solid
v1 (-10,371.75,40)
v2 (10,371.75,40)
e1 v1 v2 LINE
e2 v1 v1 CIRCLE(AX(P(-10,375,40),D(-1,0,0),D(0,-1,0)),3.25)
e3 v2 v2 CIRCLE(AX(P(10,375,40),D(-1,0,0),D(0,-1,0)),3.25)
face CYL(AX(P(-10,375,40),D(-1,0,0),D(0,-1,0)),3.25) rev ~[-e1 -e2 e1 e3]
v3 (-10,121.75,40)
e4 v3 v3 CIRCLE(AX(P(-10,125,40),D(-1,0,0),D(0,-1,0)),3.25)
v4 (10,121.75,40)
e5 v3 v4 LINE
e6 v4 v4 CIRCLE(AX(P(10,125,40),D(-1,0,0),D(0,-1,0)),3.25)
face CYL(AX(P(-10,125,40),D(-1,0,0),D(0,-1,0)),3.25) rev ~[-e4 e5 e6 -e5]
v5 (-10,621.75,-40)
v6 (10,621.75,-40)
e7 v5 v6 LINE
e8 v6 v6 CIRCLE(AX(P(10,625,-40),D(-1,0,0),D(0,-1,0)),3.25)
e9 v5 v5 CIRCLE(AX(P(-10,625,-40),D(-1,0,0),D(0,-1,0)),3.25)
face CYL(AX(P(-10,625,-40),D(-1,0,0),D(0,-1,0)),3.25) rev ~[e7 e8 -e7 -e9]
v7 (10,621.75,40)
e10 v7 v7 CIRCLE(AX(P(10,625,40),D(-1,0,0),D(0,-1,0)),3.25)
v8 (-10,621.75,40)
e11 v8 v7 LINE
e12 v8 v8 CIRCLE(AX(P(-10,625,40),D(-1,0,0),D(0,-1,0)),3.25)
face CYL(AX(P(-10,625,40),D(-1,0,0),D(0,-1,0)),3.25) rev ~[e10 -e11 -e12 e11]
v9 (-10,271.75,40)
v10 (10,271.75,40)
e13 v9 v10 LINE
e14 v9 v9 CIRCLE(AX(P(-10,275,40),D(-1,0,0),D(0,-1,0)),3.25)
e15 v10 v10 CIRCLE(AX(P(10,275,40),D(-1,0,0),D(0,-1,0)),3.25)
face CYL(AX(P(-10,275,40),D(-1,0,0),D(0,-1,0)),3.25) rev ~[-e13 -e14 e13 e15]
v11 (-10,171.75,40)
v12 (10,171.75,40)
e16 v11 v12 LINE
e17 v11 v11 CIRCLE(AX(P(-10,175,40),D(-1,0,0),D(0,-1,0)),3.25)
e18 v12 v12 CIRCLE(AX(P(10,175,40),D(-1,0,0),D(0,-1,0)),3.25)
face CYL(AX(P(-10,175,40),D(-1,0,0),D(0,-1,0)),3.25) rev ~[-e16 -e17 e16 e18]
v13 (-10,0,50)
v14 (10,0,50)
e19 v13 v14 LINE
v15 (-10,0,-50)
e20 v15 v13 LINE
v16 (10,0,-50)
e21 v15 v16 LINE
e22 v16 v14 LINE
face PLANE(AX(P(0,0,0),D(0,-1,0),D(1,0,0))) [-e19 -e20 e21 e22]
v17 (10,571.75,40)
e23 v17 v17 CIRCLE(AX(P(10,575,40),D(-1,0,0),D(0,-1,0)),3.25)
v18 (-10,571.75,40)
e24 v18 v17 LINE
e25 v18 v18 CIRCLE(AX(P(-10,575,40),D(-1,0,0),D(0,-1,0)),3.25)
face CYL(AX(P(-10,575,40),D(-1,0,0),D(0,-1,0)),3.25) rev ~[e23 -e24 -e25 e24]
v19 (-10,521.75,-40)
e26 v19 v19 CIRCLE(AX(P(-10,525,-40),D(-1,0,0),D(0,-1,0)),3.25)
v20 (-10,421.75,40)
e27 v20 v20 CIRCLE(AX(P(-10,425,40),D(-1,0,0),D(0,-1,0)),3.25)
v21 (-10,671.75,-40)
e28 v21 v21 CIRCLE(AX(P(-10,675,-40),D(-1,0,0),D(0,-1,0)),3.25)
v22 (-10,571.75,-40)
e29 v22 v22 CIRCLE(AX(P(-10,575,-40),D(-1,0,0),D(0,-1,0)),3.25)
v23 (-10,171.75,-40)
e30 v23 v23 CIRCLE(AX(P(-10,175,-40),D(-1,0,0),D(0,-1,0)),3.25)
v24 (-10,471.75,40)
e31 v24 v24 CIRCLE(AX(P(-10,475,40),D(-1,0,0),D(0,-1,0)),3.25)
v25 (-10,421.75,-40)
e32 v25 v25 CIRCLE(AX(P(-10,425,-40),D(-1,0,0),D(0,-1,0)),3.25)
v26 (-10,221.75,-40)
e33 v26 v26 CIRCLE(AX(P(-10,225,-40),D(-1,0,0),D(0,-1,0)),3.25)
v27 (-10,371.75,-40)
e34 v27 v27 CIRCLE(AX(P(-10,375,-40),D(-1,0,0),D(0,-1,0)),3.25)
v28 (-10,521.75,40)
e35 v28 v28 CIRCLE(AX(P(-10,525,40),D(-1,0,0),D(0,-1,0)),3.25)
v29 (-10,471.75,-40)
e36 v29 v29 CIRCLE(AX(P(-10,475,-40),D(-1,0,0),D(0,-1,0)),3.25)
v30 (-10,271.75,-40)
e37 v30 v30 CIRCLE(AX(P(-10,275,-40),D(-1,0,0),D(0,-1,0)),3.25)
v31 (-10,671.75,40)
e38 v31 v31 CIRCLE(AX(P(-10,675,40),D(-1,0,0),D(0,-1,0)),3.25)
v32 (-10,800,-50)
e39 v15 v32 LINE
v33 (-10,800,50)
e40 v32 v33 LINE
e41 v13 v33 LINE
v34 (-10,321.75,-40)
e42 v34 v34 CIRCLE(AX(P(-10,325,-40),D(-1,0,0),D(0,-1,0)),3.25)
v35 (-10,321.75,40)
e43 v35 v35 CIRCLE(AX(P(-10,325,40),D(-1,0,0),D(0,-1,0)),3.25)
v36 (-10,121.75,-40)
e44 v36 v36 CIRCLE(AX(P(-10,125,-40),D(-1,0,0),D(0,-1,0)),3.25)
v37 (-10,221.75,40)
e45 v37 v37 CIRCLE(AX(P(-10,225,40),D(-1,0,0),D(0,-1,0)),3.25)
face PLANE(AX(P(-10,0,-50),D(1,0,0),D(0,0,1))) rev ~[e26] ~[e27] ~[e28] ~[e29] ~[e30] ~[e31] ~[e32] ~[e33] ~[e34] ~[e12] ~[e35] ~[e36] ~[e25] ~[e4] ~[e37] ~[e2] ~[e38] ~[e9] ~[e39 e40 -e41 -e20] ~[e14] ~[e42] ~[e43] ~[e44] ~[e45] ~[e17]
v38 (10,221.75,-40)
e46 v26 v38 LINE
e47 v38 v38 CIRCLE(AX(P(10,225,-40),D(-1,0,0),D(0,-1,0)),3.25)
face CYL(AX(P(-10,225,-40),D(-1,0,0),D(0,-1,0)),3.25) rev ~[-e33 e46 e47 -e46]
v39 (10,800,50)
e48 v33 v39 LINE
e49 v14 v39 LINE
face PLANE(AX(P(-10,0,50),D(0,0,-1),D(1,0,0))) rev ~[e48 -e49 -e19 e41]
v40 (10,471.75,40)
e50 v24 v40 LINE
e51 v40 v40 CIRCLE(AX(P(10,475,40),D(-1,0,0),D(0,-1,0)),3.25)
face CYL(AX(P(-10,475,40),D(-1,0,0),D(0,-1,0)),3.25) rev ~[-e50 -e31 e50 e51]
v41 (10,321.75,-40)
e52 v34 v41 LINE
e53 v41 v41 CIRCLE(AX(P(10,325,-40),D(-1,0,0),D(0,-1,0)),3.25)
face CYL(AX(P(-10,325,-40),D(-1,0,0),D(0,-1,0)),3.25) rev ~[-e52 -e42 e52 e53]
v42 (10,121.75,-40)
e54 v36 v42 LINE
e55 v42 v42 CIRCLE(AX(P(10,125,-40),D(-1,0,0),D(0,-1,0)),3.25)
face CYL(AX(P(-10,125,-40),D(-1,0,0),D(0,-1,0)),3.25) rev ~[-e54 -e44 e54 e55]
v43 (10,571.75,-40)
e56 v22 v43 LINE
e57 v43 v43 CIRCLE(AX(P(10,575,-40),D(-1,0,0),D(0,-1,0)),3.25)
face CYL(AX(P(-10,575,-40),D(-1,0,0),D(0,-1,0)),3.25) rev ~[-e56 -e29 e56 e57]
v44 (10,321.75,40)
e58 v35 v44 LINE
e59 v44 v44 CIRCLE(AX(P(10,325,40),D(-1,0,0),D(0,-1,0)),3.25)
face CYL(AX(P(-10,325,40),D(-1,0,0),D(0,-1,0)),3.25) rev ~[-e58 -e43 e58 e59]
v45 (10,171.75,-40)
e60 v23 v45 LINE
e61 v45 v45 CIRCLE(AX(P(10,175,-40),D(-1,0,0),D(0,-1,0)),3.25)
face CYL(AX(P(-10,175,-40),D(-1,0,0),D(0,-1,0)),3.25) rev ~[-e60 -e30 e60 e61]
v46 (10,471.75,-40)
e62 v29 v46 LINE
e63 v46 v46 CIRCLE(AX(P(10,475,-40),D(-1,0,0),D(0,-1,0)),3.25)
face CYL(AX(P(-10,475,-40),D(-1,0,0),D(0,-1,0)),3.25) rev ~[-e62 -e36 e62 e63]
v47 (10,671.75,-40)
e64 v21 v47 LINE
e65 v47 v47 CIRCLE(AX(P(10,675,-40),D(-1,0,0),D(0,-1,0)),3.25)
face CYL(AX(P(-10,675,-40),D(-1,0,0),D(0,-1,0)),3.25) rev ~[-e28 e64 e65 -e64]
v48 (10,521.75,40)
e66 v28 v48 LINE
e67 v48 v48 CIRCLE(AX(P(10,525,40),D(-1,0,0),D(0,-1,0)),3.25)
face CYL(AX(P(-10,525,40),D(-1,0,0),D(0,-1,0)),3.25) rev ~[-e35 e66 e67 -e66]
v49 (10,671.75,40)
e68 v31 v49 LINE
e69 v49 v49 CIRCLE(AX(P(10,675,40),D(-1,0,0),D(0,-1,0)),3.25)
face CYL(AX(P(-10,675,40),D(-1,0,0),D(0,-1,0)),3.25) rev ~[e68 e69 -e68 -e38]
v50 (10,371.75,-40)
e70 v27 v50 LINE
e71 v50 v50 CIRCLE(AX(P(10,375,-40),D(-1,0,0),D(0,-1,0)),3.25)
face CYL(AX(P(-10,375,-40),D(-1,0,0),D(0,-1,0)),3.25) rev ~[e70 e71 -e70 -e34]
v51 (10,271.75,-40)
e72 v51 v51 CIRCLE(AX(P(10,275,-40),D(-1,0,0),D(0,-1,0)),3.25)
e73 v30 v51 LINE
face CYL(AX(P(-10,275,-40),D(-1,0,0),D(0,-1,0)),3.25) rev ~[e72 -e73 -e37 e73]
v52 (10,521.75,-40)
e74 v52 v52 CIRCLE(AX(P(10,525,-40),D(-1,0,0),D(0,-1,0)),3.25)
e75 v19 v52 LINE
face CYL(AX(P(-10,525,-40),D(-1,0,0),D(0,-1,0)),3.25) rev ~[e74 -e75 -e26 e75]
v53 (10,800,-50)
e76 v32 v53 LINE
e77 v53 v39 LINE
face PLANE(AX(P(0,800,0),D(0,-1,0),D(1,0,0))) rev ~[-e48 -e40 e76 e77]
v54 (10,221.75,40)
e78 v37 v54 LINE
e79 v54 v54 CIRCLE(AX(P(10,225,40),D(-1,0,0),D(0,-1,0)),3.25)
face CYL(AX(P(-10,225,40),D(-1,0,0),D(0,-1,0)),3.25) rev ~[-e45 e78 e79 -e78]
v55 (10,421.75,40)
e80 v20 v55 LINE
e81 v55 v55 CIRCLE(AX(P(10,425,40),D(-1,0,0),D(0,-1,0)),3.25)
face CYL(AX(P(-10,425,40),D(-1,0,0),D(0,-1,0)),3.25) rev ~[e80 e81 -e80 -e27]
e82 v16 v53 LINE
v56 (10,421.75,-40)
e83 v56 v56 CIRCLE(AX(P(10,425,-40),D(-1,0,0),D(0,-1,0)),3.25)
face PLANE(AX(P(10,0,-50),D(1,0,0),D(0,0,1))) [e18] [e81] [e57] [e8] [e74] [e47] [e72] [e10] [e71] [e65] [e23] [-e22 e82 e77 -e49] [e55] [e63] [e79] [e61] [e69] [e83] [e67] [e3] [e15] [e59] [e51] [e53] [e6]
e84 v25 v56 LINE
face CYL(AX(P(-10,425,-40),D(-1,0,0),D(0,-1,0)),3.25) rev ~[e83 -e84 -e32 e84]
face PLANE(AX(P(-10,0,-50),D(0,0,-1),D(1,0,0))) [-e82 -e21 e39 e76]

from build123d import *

# Parameters (mm, degrees)
F0_W     = 20
F0_H     = 100
F1_DEPTH = 800
F2_R     = 3.25
F3_DEPTH = 20


# Not quite as in the source:
# - a feature names something its author has since deleted; it is built from what else it names


with BuildPart() as f1:
    # F0 (on Front) → F1 (new body)
    with BuildSketch(Plane.XZ):
        Rectangle(F0_W, F0_H)
    extrude(amount=-F1_DEPTH)

    # F2 (on face) → F3 (cut, through all)
    with BuildSketch(Plane(origin=(-10, 0, 0), x_dir=(0, -1, 0), z_dir=(-1, 0, 0))):
        with Locations((-625, 40)):
            Circle(F2_R)
        with Locations((-575, 40)):
            Circle(F2_R)
        with Locations((-675, 40)):
            Circle(F2_R)
        with Locations((-675, -40)):
            Circle(F2_R)
        with Locations((-625, -40)):
            Circle(F2_R)
        with Locations((-525, -40)):
            Circle(F2_R)
        with Locations((-575, -40)):
            Circle(F2_R)
        with Locations((-525, 40)):
            Circle(F2_R)
        with Locations((-475, 40)):
            Circle(F2_R)
        with Locations((-425, 40)):
            Circle(F2_R)
        with Locations((-375, 40)):
            Circle(F2_R)
        with Locations((-325, 40)):
            Circle(F2_R)
        with Locations((-275, 40)):
            Circle(F2_R)
        with Locations((-225, 40)):
            Circle(F2_R)
        with Locations((-175, 40)):
            Circle(F2_R)
        with Locations((-175, -40)):
            Circle(F2_R)
        with Locations((-225, -40)):
            Circle(F2_R)
        with Locations((-325, -40)):
            Circle(F2_R)
        with Locations((-375, -40)):
            Circle(F2_R)
        with Locations((-425, -40)):
            Circle(F2_R)
        with Locations((-475, -40)):
            Circle(F2_R)
        with Locations((-275, -40)):
            Circle(F2_R)
        with Locations((-125, -40)):
            Circle(F2_R)
        with Locations((-125, 40)):
            Circle(F2_R)
    extrude(amount=-F3_DEPTH, mode=Mode.SUBTRACT)


solid = f1.part
